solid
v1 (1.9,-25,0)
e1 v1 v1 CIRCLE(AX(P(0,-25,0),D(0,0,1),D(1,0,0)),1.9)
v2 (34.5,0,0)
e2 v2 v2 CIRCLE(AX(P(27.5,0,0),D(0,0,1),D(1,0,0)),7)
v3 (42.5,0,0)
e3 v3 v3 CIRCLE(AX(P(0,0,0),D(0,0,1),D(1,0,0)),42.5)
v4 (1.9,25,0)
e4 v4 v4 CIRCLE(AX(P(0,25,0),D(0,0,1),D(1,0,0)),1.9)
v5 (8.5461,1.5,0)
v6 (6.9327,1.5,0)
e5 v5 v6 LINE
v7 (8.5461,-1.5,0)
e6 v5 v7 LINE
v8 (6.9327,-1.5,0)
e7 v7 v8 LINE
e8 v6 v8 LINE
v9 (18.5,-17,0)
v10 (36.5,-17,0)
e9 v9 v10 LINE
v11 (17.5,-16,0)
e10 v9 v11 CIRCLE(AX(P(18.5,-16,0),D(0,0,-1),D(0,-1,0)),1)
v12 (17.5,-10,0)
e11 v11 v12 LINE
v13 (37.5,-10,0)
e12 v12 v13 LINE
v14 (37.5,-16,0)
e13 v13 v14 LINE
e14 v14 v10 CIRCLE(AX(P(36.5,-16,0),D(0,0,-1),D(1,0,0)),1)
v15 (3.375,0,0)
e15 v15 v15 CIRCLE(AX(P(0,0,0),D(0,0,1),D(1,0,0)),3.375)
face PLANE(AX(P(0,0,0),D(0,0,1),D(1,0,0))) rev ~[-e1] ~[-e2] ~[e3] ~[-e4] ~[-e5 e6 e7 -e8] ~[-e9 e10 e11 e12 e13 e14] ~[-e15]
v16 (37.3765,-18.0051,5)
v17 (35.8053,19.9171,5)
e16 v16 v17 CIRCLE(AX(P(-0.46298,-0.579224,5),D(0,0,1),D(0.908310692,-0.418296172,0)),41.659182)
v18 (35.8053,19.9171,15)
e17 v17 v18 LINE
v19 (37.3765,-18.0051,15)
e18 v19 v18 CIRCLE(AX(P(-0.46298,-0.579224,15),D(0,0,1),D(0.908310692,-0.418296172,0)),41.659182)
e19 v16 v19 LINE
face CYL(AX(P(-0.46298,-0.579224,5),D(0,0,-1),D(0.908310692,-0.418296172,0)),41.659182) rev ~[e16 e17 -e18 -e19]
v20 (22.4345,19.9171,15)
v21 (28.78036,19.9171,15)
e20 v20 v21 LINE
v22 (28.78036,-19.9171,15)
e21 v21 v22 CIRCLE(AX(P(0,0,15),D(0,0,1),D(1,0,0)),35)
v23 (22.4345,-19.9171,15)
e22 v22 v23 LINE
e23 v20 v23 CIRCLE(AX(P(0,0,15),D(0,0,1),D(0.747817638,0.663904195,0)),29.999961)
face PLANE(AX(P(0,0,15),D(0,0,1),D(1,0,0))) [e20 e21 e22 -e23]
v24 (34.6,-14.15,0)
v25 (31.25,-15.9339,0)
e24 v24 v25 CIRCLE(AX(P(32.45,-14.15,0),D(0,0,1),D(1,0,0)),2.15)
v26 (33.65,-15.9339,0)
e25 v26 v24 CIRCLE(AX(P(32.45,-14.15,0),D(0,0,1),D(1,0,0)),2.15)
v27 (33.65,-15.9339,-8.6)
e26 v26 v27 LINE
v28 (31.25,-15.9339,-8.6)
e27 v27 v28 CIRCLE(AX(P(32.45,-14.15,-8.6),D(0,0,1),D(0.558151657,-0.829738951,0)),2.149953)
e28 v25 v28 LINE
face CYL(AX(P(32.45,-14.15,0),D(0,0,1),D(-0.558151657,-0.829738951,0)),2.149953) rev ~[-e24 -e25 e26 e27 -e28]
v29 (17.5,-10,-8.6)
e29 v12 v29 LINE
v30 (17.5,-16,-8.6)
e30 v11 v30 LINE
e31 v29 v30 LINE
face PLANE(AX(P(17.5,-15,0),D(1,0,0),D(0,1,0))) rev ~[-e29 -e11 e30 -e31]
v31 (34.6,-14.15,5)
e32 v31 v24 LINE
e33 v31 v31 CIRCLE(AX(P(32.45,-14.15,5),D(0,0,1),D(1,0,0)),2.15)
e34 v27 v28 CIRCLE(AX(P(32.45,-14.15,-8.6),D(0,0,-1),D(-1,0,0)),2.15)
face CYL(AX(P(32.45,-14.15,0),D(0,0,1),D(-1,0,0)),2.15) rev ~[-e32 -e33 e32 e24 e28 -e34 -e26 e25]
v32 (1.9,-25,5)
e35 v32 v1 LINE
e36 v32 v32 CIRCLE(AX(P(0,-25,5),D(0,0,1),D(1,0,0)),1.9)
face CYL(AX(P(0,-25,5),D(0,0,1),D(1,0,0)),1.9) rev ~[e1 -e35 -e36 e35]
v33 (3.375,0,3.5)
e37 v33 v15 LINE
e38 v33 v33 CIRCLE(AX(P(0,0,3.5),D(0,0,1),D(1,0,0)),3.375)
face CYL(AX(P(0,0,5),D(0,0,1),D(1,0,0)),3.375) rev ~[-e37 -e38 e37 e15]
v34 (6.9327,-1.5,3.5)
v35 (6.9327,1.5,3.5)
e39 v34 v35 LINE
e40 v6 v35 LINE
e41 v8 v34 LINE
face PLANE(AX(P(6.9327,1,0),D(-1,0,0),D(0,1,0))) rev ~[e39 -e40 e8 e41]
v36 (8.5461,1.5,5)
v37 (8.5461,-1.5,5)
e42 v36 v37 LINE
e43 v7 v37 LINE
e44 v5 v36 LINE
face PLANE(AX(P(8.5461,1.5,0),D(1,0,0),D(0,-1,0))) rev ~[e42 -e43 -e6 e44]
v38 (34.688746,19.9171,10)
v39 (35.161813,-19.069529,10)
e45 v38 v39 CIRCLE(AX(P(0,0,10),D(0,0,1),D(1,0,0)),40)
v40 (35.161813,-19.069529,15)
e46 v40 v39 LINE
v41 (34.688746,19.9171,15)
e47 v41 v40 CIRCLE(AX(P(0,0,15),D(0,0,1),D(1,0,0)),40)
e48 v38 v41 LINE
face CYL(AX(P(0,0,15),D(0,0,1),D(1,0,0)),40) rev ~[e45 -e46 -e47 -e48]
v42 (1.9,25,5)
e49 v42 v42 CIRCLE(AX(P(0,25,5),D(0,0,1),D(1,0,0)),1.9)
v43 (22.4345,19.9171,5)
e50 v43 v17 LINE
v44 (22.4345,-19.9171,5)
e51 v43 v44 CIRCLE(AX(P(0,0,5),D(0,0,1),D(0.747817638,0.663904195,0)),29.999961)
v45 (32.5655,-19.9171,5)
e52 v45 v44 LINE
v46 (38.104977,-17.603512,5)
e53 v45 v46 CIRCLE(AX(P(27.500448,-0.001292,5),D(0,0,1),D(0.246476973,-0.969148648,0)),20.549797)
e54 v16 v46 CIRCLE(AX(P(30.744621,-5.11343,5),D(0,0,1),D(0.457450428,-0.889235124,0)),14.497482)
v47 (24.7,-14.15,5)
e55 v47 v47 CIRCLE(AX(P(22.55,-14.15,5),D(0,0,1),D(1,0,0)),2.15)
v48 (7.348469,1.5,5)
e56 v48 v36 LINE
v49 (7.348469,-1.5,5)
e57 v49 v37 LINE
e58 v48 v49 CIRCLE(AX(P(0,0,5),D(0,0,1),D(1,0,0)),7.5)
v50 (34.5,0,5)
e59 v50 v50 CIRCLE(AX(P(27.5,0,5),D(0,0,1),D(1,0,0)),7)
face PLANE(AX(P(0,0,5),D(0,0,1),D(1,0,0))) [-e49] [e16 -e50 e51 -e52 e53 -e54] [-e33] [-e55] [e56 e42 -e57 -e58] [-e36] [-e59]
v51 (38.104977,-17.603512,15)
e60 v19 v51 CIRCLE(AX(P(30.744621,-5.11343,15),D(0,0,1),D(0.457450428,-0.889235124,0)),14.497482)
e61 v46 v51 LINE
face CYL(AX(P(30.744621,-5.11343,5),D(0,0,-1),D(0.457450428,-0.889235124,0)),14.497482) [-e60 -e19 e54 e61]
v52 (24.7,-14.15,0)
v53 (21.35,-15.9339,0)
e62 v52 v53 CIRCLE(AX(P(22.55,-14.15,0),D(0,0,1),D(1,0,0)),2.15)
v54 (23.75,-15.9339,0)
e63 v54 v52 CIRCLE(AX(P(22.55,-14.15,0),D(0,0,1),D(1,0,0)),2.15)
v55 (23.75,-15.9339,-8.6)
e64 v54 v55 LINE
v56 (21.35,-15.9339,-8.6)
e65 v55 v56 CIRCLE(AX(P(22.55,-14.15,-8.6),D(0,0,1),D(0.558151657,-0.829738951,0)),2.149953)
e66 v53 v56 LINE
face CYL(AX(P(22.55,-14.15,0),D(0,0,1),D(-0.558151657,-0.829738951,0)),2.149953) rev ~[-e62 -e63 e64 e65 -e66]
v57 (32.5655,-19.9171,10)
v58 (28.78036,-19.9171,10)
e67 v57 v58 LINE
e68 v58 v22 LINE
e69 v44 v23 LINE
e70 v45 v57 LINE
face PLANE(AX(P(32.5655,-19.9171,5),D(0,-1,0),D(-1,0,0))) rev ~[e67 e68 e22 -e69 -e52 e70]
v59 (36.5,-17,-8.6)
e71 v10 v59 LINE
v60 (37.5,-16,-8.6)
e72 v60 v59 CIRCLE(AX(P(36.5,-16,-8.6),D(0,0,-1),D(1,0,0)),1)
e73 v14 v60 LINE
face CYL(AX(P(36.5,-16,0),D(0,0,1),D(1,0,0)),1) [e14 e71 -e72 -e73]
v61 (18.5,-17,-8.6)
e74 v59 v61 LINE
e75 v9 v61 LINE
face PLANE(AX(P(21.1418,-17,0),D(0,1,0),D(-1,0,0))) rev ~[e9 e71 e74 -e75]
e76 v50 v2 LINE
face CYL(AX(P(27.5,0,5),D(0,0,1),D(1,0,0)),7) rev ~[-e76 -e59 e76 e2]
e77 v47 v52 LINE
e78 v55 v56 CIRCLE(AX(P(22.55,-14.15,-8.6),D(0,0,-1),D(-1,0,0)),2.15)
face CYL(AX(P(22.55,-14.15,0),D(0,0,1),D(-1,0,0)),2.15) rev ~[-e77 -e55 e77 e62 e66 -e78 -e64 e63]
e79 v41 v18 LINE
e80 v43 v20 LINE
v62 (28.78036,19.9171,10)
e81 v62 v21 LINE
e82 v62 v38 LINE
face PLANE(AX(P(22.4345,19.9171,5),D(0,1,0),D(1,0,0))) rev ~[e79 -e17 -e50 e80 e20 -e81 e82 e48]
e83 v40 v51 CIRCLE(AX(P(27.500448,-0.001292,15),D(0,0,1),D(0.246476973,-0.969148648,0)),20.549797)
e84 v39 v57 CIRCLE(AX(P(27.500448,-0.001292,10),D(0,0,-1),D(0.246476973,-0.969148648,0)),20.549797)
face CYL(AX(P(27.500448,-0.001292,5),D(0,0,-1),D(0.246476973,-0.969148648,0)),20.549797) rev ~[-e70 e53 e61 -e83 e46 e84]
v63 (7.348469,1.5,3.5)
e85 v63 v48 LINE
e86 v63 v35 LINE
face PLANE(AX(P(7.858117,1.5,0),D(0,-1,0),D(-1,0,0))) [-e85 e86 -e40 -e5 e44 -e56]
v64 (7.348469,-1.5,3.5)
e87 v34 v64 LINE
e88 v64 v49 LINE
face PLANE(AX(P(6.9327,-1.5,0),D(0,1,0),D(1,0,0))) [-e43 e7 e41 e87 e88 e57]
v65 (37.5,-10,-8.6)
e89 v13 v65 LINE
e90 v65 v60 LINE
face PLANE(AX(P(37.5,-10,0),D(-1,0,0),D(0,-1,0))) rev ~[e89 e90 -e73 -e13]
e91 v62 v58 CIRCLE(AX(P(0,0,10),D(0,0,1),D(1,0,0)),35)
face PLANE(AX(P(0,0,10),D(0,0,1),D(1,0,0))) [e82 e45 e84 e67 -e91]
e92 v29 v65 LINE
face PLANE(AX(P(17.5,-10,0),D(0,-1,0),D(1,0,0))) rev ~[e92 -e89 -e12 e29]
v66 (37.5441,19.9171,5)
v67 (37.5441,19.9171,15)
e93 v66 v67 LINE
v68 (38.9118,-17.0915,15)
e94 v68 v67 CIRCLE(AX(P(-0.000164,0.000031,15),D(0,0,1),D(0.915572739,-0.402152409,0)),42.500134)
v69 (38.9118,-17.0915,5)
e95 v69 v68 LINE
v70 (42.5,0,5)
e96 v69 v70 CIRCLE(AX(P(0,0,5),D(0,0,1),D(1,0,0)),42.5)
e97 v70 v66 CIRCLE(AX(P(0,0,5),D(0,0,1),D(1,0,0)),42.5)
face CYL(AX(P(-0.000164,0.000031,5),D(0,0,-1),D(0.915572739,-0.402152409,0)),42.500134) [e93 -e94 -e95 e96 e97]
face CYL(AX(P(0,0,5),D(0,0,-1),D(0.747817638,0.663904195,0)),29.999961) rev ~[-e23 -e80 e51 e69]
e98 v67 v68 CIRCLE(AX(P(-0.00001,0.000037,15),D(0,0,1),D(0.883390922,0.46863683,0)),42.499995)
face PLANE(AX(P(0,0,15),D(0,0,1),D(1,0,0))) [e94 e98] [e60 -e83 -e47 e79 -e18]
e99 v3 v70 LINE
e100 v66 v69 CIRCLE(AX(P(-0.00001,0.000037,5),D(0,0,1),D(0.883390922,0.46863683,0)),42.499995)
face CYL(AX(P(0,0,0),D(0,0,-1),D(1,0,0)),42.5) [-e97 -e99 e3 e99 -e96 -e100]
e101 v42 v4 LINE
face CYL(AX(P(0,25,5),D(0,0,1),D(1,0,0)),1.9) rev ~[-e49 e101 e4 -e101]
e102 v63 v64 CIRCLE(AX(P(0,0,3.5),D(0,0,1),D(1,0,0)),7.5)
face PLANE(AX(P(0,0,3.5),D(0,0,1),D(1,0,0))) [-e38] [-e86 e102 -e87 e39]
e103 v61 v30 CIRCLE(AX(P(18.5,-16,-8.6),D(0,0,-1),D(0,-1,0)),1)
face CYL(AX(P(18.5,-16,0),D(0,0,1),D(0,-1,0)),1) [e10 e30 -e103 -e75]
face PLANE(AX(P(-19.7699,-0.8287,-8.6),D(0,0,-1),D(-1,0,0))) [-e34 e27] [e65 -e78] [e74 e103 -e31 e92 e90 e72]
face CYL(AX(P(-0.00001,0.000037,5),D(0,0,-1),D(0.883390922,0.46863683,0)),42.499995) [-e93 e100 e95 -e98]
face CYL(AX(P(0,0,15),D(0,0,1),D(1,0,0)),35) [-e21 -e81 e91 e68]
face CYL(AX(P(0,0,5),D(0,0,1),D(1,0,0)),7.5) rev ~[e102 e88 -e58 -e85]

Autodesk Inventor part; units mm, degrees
ref_plane "YZ Plane" through (0, 0, 0) normal (1, 0, 0) x (0, 1, 0)
ref_plane "XZ Plane" through (0, 0, 0) normal (0, 1, 0) x (-1, 0, 0)
ref_plane "XY Plane" through (0, 0, 0) normal (0, 0, 1) x (1, 0, 0)
sketch "Эскиз2" plane through (0, 0, 0) normal (0, 0, 1) x (1, 0, 0)
  circle A0 centre (0, 0) radius 42.5
  dimension "d0" = 85
extrude "Выдавливание1" add sketch "Эскиз2" along normal blind 5
sketch "Эскиз3" plane through (0, 0, 5) normal (0, 0, 1) x (1, 0, 0)
  circle A0 centre (27.5, 0) radius 7
  arc A1 (22.4345, 19.9171) -> (22.4345, -19.9171) centre (0, 0) ccw
  line L0 (32.5655, -19.9171) -> (22.4345, -19.9171)
  arc A2 (32.5655, -19.9171) -> (38.9118, -17.0915) centre (27.5, 0) ccw
  arc A3 (38.9118, -17.0915) -> (37.5441, 19.9171) centre (0, 0) ccw
  line L1 (22.4345, 19.9171) -> (37.5441, 19.9171)
  circle A4 centre (32.45, -14.15) radius 2.15
  circle A5 centre (0, 0) radius 8
  circle A6 centre (22.55, -14.15) radius 2.15
  arc A7 (32.5655, -19.9171) -> (38.9118, -17.0915) centre (27.5, 0) ccw
  line L2 (32.5655, -19.9171) -> (22.4345, -19.9171)
  arc A8 (22.4345, 19.9171) -> (22.4345, -19.9171) centre (0, 0) ccw
  line L3 (22.4345, 19.9171) -> (37.5441, 19.9171)
  arc A9 (37.5441, 19.9171) -> (38.9118, -17.0915) centre (0, 0) ccw
  point P0 (0, -36.1)
extrude "Выдавливание2" add sketch "Эскиз3" along normal blind 10 contours A1 L0 A2 A9 L1
sketch "Эскиз4" plane through (0, 0, 5) normal (0, 0, 1) x (1, 0, 0)
  circle A0 centre (27.5, 0) radius 7
  arc A1 (22.4345, 19.9171) -> (22.4345, -19.9171) centre (0, 0) ccw
  line L0 (32.5655, -19.9171) -> (22.4345, -19.9171)
  arc A2 (32.5655, -19.9171) -> (38.9118, -17.0915) centre (27.5, 0) ccw
  arc A3 (38.9118, -17.0915) -> (37.5441, 19.9171) centre (0, 0) ccw
  line L1 (22.4345, 19.9171) -> (37.5441, 19.9171)
  circle A4 centre (32.45, -14.15) radius 2.15
  circle A5 centre (0, 0) radius 8
  circle A6 centre (22.55, -14.15) radius 2.15
  arc A7 (32.5655, -19.9171) -> (38.9118, -17.0915) centre (27.5, 0) ccw
  line L2 (32.5655, -19.9171) -> (22.4345, -19.9171)
  arc A8 (22.4345, 19.9171) -> (22.4345, -19.9171) centre (0, 0) ccw
  line L3 (22.4345, 19.9171) -> (37.5441, 19.9171)
  arc A9 (37.5441, 19.9171) -> (38.9118, -17.0915) centre (0, 0) ccw
  point P0 (0, -36.1)
extrude "Выдавливание3" cut sketch "Эскиз4" against normal blind 10 contours A0 | A4 | A5 | A6
sketch "Эскиз5" plane through (-19.7699, -0.8287, 0) normal (0, 0, -1) x (-1, 0, 0)
  line L0 (-37.2699, -9.1713) -> (-57.2699, -9.1713)
  line L1 (-57.2699, -9.1713) -> (-57.2699, -15.1713)
  arc A0 (-57.2699, -15.1713) -> (-56.2699, -16.1713) centre (-56.2699, -15.1713) ccw
  line L2 (-56.2699, -16.1713) -> (-53.4199, -16.1713)
  arc A1 (-51.0199, -15.1052) -> (-53.4199, -15.1052) centre (-52.2199, -13.3213) ccw
  line L3 (-51.0199, -16.1713) -> (-43.5199, -16.1713)
  arc A2 (-41.1199, -15.1052) -> (-43.5199, -15.1052) centre (-42.3199, -13.3213) ccw
  line L4 (-41.1199, -16.1713) -> (-38.2699, -16.1713)
  arc A3 (-38.2699, -16.1713) -> (-37.2699, -15.1713) centre (-38.2699, -15.1713) ccw
  line L5 (-37.2699, -15.1713) -> (-37.2699, -9.1713)
  line L6 (-43.5199, 38.5287) -> (-43.5199, 37.4627)
  line L7 (-51.0199, 38.5287) -> (-43.5199, 38.5287)
  line L8 (-51.0199, 37.4627) -> (-51.0199, 38.5287)
  arc A4 (-53.4199, 37.4627) -> (-51.0199, 37.4627) centre (-52.2199, 35.6787) ccw
  line L9 (-53.4199, 38.5287) -> (-53.4199, 37.4627)
  line L10 (-56.2699, 38.5287) -> (-53.4199, 38.5287)
  arc A5 (-56.2699, 38.5287) -> (-57.2699, 37.5287) centre (-56.2699, 37.5287) ccw
  line L11 (-57.2699, 31.5287) -> (-57.2699, 37.5287)
  line L12 (-37.2699, 31.5287) -> (-57.2699, 31.5287)
  line L13 (-37.2699, 37.5287) -> (-37.2699, 31.5287)
  arc A6 (-37.2699, 37.5287) -> (-38.2699, 38.5287) centre (-38.2699, 37.5287) ccw
  line L14 (-41.1199, 38.5287) -> (-38.2699, 38.5287)
  line L15 (-41.1199, 37.4627) -> (-41.1199, 38.5287)
  arc A7 (-43.5199, 37.4627) -> (-41.1199, 37.4627) centre (-42.3199, 35.6787) ccw
  line L16 (-57.2699, -9.1713) -> (-57.2699, 31.5287)
  line L17 (-37.2699, 31.5287) -> (-37.2699, -9.1713)
  line L18 (-37.2699, -9.1713) -> (-57.2699, -9.1713)
  circle A8 centre (-47.2699, 0.8287) radius 1.25
  circle A9 centre (-47.2699, 0.8287) radius 3.4957
  circle A10 centre (-47.2699, 0.8287) radius 2.6787
  circle A11 centre (-47.2699, 0.8287) radius 5.4
  line L19 (-37.2699, -14.1713) -> (-37.2699, 15.8287)
  line L20 (-37.2699, 0.8287) -> (-47.2699, 0.8287)
  circle A12 centre (-52.2199, -13.3213) radius 2.15
  circle A13 centre (-42.3199, -13.3213) radius 2.15
  line L21 (-53.4199, -16.1713) -> (-51.0199, -16.1713)
  line L22 (-43.5199, -16.1713) -> (-40.9117, -16.1713)
  circle A14 centre (-52.2199, -13.3213) radius 2.15 projected
  point P0 (0, -36.1)
  point P1 (0, -36.1)
  point P2 (-37.2699, 11.1787)
  dimension "d7" = 10
extrude "Выдавливание4" add sketch "Эскиз5" along normal blind 8.6 contours L5 A3 L4 L22 L3 L21 L2 A0 L1 L0
sketch "Эскиз6" plane through (0, 0, 5) normal (0, 0, 1) x (1, 0, 0)
  circle A0 centre (0, 25) radius 1.9
  circle A1 centre (0, -25) radius 1.9
  circle A2 centre (0, 0) radius 8
  line L0 (-17.5, -36.1) -> (17.5, -36.1)
  line L1 (17.5, -36.1) -> (17.5, 36.1)
  line L2 (17.5, 36.1) -> (-17.5, 36.1)
  line L3 (-17.5, 36.1) -> (-17.5, -36.1)
  point P0 (0, -36.1)
extrude "Выдавливание5" cut sketch "Эскиз6" against normal blind 10 contours A0 | A1
sketch "Эскиз7" plane through (0, 0, 5) normal (0, 0, 1) x (1, 0, 0)
  point P0 (0, 0)
sketch "Эскиз8" plane through (0, 0, 5) normal (0, 0, 1) x (1, 0, 0)
  circle A0 centre (0, 0) radius 8
  circle A1 centre (0, 0) radius 5.375
  circle A2 centre (0, 0) radius 3.375
  line L0 (-6.9327, -1) -> (-6.9327, 1)
  line L1 (-8.2327, 1.5) -> (-6.9327, 1.5)
  line L2 (-6.9327, -1.5) -> (-6.9327, -1)
  line L3 (-6.9327, -1.5) -> (-8.2327, -1.5)
  spline S0 degree 3 poles (-8.2327, -1.5) (-8.2334, -1.4968) (-8.234, -1.4935) (-8.2347, -1.4903) (-8.2347, -1.4901) (-8.2347, -1.49) (-8.2361, -1.4829) (-8.2382, -1.4724) (-8.2457, -1.4333) (-8.2525, -1.3974) (-8.2687, -1.3062) (-8.278, -1.2509) (-8.2965, -1.1299) (-8.3056, -1.0653) (-8.3138, -1) knots 0 0 0 0 0.066869 0.066869 0.066869 0.069411 0.069411 0.210348 0.210348 0.466356 0.466356 0.734146 0.734146 1 1 1 1
  ellipse E0 centre (-0.8138, 2.2378) end of major axis (-6.2384, -4.8493) minor radius 6.6293 (-8.308, 1) -> (-8.3138, -1) ccw
  spline S1 degree 3 poles (-8.308, 1) (-8.3, 1.0653) (-8.2914, 1.1299) (-8.274, 1.2508) (-8.2654, 1.3061) (-8.2506, 1.3973) (-8.2444, 1.4332) (-8.2376, 1.4723) (-8.2358, 1.4829) (-8.2345, 1.49) (-8.2345, 1.4901) (-8.2345, 1.4902) (-8.2339, 1.4935) (-8.2333, 1.4967) (-8.2327, 1.5) knots 0 0 0 0 0.265855 0.265855 0.533308 0.533308 0.789424 0.789424 0.930547 0.930547 0.932946 0.932946 0.932946 1 1 1 1
  dimension "d18" = 6.75
extrude "Выдавливание6" add sketch "Эскиз8" against normal blind 5 contours A0 | A1
sketch "Эскиз9" plane through (0, 0, 0) normal (0, 0, -1) x (-1, 0, 0)
  circle A0 centre (0, 0) radius 8
  circle A1 centre (0, 0) radius 5.375
  circle A2 centre (0, 0) radius 3.375
  line L0 (-6.9327, -1) -> (-6.9327, 1)
  line L1 (-8.2327, 1.5) -> (-6.9327, 1.5)
  line L2 (-6.9327, -1.5) -> (-6.9327, -1)
  line L3 (-6.9327, -1.5) -> (-8.2327, -1.5)
  spline S0 degree 3 poles (-8.2327, -1.5) (-8.2334, -1.4968) (-8.234, -1.4935) (-8.2347, -1.4903) (-8.2347, -1.4901) (-8.2347, -1.49) (-8.2361, -1.4829) (-8.2382, -1.4724) (-8.2457, -1.4333) (-8.2525, -1.3974) (-8.2687, -1.3062) (-8.278, -1.2509) (-8.2965, -1.1299) (-8.3056, -1.0653) (-8.3138, -1) knots 0 0 0 0 0.066869 0.066869 0.066869 0.069411 0.069411 0.210348 0.210348 0.466356 0.466356 0.734146 0.734146 1 1 1 1
  ellipse E0 centre (-0.8138, 2.2378) end of major axis (-6.2384, -4.8493) minor radius 6.6293 (-8.308, 1) -> (-8.3138, -1) ccw
  spline S1 degree 3 poles (-8.308, 1) (-8.3, 1.0653) (-8.2914, 1.1299) (-8.274, 1.2508) (-8.2654, 1.3061) (-8.2506, 1.3973) (-8.2444, 1.4332) (-8.2376, 1.4723) (-8.2358, 1.4829) (-8.2345, 1.49) (-8.2345, 1.4901) (-8.2345, 1.4902) (-8.2339, 1.4935) (-8.2333, 1.4967) (-8.2327, 1.5) knots 0 0 0 0 0.265855 0.265855 0.533308 0.533308 0.789424 0.789424 0.930547 0.930547 0.932946 0.932946 0.932946 1 1 1 1
  line L4 (-6.9327, 1.5) -> (-8.5461, 1.5)
  line L5 (-8.5461, 1.5) -> (-8.5461, -1.5)
  line L6 (-8.5461, -1.5) -> (-6.9327, -1.5)
  line L7 (-6.9327, -1.5) -> (-6.9327, 1.5)
  dimension "d19" = 6.75
extrude "Выдавливание7" cut sketch "Эскиз9" against normal blind 5 contours L1 L7 L0 L2 L3 A0 | A0 L3 S0 E0 S1 L1 | S1 E0 S0 L6 L5 L4 picked at (-7.2832, -0.1675)
sketch "Эскиз10" plane through (0, 0, 5) normal (0, 0, 1) x (1, 0, 0)
  arc A0 (32.5655, -19.9171) -> (38.9118, -17.0915) centre (27.5, 0) ccw projected
  line L0 (37.5441, 19.9171) -> (22.4345, 19.9171) projected
  arc A1 (37.3765, -18.0051) -> (35.8053, 19.9171) centre (-0.4631, -0.5792) ccw
  arc A2 (37.3765, -18.0051) -> (38.9118, -17.0915) centre (30.7338, -5.0939) ccw
  line L1 (37.4224, 19.9171) -> (35.8053, 19.9171)
  arc A3 (38.9118, -17.0915) -> (37.5441, 19.9171) centre (0, 0) ccw projected
  arc A4 (38.9118, -17.0915) -> (37.5441, 19.9171) centre (0, 0) ccw
  line L2 (37.5441, 19.9171) -> (35.8053, 19.9171)
extrude "Выдавливание8" add sketch "Эскиз10" along normal up to surface (10 mm away)
sketch "Эскиз11" plane through (0, 0, 15) normal (0, 0, 1) x (1, 0, 0)
  circle A0 centre (0, 0) radius 3.375 projected
  circle A1 centre (0, 0) radius 40
  circle A2 centre (0, 0) radius 35
  dimension "d25" = 80
  dimension "d26" = 70
extrude "Выдавливание9" cut sketch "Эскиз11" against normal blind 5 contours A1
sketch "Эскиз12" plane through (0, 0, 5) normal (0, 0, 1) x (1, 0, 0)
  circle A0 centre (0, 0) radius 7.5
  dimension "d29" = 15
extrude "Выдавливание10" cut sketch "Эскиз12" against normal blind 1.5
sketch "Эскиз13" plane through (0, 0, 15) normal (0, 0, 1) x (1, 0, 0)
  circle A0 centre (0, 0) radius 3.375 projected
  circle A1 centre (0, 0) radius 44
  circle A2 centre (0.6251, 46.3721) radius 3.6178
  circle A3 centre (0.6251, 46.3721) radius 3.0311
  circle A4 centre (0.6251, 46.3721) radius 3.8133
  circle A5 centre (0.6251, 46.3721) radius 2.8356
  circle A6 centre (0.6251, 46.3721) radius 1.9556
  circle A7 centre (0, 0) radius 42.5
  dimension "d32" = 88
extrude "Выдавливание11" [suppressed]
sketch "Эскиз14" plane through (0, 0, 0) normal (0, 0, -1) x (-1, 0, 0)
  circle A0 centre (0, 0) radius 44
  circle A1 centre (0, 0) radius 42.5
  dimension "d35" = 85
extrude "Выдавливание12" [suppressed]
properties part number "joint2_rotate_mec" material "Пластик АБС"
